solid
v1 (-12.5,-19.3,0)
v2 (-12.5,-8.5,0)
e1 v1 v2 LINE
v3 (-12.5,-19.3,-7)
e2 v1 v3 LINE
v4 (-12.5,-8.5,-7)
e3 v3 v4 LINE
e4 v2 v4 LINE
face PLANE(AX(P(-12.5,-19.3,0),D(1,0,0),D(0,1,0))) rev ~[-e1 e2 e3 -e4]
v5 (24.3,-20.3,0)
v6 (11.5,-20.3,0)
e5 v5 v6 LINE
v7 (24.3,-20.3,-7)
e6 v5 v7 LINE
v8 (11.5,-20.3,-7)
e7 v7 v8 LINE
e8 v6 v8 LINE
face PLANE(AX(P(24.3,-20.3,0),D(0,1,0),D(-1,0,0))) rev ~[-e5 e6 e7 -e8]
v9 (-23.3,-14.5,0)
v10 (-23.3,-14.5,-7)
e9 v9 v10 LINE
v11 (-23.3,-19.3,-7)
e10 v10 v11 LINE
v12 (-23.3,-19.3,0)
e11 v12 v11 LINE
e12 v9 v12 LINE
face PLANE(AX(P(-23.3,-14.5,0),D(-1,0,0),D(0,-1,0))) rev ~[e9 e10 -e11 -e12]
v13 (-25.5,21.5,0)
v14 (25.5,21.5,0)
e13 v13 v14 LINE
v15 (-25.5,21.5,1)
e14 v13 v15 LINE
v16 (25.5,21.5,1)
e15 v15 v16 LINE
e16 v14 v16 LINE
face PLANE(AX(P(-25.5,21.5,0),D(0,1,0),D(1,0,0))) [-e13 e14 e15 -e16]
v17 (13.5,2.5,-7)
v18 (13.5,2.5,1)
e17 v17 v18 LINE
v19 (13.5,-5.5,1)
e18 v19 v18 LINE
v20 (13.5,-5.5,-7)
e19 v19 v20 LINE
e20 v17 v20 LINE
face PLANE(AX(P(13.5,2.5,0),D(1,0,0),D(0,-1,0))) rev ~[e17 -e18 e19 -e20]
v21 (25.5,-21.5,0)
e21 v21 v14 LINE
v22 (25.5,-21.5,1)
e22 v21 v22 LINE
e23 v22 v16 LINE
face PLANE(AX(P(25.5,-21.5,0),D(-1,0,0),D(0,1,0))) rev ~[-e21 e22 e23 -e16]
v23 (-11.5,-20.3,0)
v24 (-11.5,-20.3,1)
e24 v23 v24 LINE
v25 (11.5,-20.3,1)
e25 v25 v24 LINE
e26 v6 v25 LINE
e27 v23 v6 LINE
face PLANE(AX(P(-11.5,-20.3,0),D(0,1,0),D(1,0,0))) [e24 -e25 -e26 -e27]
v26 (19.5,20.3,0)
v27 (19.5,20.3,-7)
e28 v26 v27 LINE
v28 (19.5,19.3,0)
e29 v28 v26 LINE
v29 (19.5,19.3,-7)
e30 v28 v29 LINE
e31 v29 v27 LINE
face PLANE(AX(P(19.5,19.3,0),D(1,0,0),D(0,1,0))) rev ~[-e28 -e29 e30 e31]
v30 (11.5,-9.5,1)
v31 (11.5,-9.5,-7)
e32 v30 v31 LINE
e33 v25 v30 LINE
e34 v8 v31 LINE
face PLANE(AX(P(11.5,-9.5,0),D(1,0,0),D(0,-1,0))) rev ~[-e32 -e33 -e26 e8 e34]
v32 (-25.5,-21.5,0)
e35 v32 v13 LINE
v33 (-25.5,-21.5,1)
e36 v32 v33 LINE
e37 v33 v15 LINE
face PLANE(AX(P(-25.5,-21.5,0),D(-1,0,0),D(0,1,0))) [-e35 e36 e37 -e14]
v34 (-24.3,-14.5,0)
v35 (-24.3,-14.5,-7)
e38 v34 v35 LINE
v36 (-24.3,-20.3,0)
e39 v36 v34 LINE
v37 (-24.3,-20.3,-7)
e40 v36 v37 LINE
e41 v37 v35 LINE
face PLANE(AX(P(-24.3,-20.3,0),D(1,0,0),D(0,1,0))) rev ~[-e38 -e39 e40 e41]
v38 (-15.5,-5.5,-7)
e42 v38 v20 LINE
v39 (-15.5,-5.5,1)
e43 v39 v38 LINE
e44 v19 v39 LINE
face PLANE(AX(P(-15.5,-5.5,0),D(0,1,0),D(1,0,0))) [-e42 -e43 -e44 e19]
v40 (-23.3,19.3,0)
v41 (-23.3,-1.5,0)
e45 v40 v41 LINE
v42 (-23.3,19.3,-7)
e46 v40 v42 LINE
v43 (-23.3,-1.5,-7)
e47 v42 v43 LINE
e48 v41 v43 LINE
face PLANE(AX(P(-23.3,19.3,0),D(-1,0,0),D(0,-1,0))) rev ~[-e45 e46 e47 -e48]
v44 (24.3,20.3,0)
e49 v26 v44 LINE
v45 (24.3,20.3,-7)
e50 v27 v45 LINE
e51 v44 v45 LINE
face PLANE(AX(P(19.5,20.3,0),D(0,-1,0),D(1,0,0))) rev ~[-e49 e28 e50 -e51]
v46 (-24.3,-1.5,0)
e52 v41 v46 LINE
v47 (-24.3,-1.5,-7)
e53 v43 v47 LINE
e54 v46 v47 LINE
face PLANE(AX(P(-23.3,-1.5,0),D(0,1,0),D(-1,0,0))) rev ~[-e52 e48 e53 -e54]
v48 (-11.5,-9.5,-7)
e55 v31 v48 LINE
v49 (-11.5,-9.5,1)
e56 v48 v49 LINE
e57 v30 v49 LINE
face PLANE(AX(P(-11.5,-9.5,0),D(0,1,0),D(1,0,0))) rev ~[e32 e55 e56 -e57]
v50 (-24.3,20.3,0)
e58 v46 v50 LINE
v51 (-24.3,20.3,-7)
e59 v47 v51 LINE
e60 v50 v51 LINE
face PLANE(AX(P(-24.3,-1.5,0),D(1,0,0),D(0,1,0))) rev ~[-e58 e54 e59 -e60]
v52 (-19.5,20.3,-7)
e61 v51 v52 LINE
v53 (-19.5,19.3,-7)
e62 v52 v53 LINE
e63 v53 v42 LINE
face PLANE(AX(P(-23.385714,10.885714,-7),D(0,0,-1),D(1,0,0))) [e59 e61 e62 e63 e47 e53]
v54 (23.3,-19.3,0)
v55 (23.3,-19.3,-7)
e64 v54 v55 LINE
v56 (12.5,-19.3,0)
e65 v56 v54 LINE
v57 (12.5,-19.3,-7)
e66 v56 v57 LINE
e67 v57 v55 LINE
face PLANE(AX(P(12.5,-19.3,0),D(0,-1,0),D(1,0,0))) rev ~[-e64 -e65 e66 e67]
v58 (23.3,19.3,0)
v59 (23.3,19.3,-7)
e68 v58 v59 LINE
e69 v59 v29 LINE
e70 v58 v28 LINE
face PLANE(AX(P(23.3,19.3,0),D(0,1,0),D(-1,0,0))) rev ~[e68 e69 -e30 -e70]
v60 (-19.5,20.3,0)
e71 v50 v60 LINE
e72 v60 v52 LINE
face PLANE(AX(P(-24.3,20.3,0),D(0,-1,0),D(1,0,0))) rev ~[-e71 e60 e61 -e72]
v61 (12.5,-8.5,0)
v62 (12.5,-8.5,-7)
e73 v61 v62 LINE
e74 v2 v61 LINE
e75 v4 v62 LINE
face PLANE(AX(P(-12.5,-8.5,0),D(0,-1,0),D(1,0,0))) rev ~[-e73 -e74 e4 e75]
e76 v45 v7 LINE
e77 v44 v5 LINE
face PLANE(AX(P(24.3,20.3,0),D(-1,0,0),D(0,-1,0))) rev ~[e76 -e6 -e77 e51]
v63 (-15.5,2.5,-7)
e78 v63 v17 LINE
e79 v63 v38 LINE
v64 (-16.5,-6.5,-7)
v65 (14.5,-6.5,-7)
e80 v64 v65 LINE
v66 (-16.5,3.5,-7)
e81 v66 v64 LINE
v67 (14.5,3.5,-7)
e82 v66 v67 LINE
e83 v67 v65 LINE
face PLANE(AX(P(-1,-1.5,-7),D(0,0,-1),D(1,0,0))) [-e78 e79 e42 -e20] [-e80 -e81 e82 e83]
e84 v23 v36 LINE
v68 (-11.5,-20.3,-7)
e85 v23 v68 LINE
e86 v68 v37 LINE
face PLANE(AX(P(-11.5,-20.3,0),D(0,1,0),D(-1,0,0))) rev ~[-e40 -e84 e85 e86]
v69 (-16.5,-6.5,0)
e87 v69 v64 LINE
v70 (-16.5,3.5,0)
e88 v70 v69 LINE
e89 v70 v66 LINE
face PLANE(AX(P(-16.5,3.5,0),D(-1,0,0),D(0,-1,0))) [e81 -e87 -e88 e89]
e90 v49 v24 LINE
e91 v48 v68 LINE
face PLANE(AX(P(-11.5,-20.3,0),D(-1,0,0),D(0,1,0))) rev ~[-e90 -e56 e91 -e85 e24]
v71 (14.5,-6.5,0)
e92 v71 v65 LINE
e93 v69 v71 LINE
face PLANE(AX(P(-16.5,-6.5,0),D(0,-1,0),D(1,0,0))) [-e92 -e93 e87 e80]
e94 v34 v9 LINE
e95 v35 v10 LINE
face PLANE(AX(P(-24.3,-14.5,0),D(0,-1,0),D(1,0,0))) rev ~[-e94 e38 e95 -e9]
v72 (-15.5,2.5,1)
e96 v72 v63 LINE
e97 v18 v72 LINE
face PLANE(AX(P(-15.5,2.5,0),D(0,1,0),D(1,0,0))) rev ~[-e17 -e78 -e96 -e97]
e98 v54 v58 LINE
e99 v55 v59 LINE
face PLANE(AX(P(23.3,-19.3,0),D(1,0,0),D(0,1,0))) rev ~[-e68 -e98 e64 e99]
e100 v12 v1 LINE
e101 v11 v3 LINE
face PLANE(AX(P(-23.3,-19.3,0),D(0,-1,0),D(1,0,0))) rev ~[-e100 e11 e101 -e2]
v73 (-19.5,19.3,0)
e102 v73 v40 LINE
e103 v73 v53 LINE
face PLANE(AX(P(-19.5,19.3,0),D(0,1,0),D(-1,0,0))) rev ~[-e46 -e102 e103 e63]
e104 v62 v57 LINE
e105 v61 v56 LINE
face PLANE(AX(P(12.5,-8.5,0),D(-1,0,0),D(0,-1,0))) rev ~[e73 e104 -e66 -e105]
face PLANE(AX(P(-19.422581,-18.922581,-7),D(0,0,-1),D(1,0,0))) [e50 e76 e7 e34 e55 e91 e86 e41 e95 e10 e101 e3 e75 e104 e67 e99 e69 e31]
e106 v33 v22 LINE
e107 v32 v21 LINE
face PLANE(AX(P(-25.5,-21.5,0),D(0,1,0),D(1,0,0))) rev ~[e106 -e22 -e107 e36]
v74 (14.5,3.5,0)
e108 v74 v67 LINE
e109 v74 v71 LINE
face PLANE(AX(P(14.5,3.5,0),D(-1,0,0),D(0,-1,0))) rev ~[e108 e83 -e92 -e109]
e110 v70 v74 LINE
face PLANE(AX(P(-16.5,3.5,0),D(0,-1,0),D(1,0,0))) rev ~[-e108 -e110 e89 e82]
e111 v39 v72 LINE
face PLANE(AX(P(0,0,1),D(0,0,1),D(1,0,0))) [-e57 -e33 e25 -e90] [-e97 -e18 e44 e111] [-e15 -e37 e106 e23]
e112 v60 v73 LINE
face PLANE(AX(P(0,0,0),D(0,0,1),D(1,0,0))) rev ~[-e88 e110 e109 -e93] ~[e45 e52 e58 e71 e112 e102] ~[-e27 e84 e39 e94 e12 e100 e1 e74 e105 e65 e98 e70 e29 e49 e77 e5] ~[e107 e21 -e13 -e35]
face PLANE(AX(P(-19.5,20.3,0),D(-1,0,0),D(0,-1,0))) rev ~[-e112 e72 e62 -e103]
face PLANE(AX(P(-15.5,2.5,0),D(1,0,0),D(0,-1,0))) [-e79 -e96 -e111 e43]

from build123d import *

# Parameters (mm, degrees)
F0_W     = 51
F0_H     = 43
F1_DEPTH = 1
F2_W     = 31
F2_H     = 10
F2_W_2   = 29
F2_H_2   = 8
F3_DEPTH = 7
F4_DEPTH = 25
F2_W_3   = 23
F2_H_3   = 1
F2_H_4   = 9.8
F5_DEPTH = 25


with BuildPart() as f1:
    # F0 (on Top) → F1 (new body)
    with BuildSketch(Plane.XY):
        Rectangle(F0_W, F0_H)
    extrude(amount=F1_DEPTH)

    # F2 (on face) → F3 (join)
    with BuildSketch(Plane(origin=(0, 0, 0), x_dir=(1, 0, 0), z_dir=(0, 0, -1))):
        Polygon((-11.5, 19.3), (-11.5, 20.3), (-24.3, 20.3), (-24.3, 14.5), (-23.3, 14.5), (-23.3, 19.3), (-12.5, 19.3), align=None)
        Polygon((19.5, -20.3), (24.3, -20.3), (24.3, 20.3), (11.5, 20.3), (11.5, 19.3), (12.5, 19.3), (23.3, 19.3), (23.3, -19.3), (19.5, -19.3), align=None)
        Polygon((-24.3, -20.3), (-19.5, -20.3), (-19.5, -19.3), (-23.3, -19.3), (-23.3, 1.5), (-24.3, 1.5), align=None)
        with Locations((-1, 1.5)):
            Rectangle(F2_W, F2_H)
        with Locations((-1, 1.5)):
            Rectangle(F2_W_2, F2_H_2, mode=Mode.SUBTRACT)
        Polygon((12.5, 19.3), (11.5, 19.3), (11.5, 9.5), (-11.5, 9.5), (-11.5, 19.3), (-12.5, 19.3), (-12.5, 8.5), (12.5, 8.5), align=None)
    extrude(amount=F3_DEPTH)

    # F4 (cut): a face of the model
    f4_faces = [f1.faces().sort_by_distance(p)[0] for p in [
        (-1, -1.5, 0),
    ]]
    extrude(f4_faces, amount=-F4_DEPTH, mode=Mode.SUBTRACT)

    # F2 (on face) → F5 (cut)
    with BuildSketch(Plane(origin=(0, 0, 0), x_dir=(1, 0, 0), z_dir=(0, 0, -1))):
        with Locations((0, 19.8)):
            Rectangle(F2_W_3, F2_H_3)
        with Locations((0, 14.4)):
            Rectangle(F2_W_3, F2_H_4)
    extrude(amount=-F5_DEPTH, mode=Mode.SUBTRACT)


solid = f1.part
